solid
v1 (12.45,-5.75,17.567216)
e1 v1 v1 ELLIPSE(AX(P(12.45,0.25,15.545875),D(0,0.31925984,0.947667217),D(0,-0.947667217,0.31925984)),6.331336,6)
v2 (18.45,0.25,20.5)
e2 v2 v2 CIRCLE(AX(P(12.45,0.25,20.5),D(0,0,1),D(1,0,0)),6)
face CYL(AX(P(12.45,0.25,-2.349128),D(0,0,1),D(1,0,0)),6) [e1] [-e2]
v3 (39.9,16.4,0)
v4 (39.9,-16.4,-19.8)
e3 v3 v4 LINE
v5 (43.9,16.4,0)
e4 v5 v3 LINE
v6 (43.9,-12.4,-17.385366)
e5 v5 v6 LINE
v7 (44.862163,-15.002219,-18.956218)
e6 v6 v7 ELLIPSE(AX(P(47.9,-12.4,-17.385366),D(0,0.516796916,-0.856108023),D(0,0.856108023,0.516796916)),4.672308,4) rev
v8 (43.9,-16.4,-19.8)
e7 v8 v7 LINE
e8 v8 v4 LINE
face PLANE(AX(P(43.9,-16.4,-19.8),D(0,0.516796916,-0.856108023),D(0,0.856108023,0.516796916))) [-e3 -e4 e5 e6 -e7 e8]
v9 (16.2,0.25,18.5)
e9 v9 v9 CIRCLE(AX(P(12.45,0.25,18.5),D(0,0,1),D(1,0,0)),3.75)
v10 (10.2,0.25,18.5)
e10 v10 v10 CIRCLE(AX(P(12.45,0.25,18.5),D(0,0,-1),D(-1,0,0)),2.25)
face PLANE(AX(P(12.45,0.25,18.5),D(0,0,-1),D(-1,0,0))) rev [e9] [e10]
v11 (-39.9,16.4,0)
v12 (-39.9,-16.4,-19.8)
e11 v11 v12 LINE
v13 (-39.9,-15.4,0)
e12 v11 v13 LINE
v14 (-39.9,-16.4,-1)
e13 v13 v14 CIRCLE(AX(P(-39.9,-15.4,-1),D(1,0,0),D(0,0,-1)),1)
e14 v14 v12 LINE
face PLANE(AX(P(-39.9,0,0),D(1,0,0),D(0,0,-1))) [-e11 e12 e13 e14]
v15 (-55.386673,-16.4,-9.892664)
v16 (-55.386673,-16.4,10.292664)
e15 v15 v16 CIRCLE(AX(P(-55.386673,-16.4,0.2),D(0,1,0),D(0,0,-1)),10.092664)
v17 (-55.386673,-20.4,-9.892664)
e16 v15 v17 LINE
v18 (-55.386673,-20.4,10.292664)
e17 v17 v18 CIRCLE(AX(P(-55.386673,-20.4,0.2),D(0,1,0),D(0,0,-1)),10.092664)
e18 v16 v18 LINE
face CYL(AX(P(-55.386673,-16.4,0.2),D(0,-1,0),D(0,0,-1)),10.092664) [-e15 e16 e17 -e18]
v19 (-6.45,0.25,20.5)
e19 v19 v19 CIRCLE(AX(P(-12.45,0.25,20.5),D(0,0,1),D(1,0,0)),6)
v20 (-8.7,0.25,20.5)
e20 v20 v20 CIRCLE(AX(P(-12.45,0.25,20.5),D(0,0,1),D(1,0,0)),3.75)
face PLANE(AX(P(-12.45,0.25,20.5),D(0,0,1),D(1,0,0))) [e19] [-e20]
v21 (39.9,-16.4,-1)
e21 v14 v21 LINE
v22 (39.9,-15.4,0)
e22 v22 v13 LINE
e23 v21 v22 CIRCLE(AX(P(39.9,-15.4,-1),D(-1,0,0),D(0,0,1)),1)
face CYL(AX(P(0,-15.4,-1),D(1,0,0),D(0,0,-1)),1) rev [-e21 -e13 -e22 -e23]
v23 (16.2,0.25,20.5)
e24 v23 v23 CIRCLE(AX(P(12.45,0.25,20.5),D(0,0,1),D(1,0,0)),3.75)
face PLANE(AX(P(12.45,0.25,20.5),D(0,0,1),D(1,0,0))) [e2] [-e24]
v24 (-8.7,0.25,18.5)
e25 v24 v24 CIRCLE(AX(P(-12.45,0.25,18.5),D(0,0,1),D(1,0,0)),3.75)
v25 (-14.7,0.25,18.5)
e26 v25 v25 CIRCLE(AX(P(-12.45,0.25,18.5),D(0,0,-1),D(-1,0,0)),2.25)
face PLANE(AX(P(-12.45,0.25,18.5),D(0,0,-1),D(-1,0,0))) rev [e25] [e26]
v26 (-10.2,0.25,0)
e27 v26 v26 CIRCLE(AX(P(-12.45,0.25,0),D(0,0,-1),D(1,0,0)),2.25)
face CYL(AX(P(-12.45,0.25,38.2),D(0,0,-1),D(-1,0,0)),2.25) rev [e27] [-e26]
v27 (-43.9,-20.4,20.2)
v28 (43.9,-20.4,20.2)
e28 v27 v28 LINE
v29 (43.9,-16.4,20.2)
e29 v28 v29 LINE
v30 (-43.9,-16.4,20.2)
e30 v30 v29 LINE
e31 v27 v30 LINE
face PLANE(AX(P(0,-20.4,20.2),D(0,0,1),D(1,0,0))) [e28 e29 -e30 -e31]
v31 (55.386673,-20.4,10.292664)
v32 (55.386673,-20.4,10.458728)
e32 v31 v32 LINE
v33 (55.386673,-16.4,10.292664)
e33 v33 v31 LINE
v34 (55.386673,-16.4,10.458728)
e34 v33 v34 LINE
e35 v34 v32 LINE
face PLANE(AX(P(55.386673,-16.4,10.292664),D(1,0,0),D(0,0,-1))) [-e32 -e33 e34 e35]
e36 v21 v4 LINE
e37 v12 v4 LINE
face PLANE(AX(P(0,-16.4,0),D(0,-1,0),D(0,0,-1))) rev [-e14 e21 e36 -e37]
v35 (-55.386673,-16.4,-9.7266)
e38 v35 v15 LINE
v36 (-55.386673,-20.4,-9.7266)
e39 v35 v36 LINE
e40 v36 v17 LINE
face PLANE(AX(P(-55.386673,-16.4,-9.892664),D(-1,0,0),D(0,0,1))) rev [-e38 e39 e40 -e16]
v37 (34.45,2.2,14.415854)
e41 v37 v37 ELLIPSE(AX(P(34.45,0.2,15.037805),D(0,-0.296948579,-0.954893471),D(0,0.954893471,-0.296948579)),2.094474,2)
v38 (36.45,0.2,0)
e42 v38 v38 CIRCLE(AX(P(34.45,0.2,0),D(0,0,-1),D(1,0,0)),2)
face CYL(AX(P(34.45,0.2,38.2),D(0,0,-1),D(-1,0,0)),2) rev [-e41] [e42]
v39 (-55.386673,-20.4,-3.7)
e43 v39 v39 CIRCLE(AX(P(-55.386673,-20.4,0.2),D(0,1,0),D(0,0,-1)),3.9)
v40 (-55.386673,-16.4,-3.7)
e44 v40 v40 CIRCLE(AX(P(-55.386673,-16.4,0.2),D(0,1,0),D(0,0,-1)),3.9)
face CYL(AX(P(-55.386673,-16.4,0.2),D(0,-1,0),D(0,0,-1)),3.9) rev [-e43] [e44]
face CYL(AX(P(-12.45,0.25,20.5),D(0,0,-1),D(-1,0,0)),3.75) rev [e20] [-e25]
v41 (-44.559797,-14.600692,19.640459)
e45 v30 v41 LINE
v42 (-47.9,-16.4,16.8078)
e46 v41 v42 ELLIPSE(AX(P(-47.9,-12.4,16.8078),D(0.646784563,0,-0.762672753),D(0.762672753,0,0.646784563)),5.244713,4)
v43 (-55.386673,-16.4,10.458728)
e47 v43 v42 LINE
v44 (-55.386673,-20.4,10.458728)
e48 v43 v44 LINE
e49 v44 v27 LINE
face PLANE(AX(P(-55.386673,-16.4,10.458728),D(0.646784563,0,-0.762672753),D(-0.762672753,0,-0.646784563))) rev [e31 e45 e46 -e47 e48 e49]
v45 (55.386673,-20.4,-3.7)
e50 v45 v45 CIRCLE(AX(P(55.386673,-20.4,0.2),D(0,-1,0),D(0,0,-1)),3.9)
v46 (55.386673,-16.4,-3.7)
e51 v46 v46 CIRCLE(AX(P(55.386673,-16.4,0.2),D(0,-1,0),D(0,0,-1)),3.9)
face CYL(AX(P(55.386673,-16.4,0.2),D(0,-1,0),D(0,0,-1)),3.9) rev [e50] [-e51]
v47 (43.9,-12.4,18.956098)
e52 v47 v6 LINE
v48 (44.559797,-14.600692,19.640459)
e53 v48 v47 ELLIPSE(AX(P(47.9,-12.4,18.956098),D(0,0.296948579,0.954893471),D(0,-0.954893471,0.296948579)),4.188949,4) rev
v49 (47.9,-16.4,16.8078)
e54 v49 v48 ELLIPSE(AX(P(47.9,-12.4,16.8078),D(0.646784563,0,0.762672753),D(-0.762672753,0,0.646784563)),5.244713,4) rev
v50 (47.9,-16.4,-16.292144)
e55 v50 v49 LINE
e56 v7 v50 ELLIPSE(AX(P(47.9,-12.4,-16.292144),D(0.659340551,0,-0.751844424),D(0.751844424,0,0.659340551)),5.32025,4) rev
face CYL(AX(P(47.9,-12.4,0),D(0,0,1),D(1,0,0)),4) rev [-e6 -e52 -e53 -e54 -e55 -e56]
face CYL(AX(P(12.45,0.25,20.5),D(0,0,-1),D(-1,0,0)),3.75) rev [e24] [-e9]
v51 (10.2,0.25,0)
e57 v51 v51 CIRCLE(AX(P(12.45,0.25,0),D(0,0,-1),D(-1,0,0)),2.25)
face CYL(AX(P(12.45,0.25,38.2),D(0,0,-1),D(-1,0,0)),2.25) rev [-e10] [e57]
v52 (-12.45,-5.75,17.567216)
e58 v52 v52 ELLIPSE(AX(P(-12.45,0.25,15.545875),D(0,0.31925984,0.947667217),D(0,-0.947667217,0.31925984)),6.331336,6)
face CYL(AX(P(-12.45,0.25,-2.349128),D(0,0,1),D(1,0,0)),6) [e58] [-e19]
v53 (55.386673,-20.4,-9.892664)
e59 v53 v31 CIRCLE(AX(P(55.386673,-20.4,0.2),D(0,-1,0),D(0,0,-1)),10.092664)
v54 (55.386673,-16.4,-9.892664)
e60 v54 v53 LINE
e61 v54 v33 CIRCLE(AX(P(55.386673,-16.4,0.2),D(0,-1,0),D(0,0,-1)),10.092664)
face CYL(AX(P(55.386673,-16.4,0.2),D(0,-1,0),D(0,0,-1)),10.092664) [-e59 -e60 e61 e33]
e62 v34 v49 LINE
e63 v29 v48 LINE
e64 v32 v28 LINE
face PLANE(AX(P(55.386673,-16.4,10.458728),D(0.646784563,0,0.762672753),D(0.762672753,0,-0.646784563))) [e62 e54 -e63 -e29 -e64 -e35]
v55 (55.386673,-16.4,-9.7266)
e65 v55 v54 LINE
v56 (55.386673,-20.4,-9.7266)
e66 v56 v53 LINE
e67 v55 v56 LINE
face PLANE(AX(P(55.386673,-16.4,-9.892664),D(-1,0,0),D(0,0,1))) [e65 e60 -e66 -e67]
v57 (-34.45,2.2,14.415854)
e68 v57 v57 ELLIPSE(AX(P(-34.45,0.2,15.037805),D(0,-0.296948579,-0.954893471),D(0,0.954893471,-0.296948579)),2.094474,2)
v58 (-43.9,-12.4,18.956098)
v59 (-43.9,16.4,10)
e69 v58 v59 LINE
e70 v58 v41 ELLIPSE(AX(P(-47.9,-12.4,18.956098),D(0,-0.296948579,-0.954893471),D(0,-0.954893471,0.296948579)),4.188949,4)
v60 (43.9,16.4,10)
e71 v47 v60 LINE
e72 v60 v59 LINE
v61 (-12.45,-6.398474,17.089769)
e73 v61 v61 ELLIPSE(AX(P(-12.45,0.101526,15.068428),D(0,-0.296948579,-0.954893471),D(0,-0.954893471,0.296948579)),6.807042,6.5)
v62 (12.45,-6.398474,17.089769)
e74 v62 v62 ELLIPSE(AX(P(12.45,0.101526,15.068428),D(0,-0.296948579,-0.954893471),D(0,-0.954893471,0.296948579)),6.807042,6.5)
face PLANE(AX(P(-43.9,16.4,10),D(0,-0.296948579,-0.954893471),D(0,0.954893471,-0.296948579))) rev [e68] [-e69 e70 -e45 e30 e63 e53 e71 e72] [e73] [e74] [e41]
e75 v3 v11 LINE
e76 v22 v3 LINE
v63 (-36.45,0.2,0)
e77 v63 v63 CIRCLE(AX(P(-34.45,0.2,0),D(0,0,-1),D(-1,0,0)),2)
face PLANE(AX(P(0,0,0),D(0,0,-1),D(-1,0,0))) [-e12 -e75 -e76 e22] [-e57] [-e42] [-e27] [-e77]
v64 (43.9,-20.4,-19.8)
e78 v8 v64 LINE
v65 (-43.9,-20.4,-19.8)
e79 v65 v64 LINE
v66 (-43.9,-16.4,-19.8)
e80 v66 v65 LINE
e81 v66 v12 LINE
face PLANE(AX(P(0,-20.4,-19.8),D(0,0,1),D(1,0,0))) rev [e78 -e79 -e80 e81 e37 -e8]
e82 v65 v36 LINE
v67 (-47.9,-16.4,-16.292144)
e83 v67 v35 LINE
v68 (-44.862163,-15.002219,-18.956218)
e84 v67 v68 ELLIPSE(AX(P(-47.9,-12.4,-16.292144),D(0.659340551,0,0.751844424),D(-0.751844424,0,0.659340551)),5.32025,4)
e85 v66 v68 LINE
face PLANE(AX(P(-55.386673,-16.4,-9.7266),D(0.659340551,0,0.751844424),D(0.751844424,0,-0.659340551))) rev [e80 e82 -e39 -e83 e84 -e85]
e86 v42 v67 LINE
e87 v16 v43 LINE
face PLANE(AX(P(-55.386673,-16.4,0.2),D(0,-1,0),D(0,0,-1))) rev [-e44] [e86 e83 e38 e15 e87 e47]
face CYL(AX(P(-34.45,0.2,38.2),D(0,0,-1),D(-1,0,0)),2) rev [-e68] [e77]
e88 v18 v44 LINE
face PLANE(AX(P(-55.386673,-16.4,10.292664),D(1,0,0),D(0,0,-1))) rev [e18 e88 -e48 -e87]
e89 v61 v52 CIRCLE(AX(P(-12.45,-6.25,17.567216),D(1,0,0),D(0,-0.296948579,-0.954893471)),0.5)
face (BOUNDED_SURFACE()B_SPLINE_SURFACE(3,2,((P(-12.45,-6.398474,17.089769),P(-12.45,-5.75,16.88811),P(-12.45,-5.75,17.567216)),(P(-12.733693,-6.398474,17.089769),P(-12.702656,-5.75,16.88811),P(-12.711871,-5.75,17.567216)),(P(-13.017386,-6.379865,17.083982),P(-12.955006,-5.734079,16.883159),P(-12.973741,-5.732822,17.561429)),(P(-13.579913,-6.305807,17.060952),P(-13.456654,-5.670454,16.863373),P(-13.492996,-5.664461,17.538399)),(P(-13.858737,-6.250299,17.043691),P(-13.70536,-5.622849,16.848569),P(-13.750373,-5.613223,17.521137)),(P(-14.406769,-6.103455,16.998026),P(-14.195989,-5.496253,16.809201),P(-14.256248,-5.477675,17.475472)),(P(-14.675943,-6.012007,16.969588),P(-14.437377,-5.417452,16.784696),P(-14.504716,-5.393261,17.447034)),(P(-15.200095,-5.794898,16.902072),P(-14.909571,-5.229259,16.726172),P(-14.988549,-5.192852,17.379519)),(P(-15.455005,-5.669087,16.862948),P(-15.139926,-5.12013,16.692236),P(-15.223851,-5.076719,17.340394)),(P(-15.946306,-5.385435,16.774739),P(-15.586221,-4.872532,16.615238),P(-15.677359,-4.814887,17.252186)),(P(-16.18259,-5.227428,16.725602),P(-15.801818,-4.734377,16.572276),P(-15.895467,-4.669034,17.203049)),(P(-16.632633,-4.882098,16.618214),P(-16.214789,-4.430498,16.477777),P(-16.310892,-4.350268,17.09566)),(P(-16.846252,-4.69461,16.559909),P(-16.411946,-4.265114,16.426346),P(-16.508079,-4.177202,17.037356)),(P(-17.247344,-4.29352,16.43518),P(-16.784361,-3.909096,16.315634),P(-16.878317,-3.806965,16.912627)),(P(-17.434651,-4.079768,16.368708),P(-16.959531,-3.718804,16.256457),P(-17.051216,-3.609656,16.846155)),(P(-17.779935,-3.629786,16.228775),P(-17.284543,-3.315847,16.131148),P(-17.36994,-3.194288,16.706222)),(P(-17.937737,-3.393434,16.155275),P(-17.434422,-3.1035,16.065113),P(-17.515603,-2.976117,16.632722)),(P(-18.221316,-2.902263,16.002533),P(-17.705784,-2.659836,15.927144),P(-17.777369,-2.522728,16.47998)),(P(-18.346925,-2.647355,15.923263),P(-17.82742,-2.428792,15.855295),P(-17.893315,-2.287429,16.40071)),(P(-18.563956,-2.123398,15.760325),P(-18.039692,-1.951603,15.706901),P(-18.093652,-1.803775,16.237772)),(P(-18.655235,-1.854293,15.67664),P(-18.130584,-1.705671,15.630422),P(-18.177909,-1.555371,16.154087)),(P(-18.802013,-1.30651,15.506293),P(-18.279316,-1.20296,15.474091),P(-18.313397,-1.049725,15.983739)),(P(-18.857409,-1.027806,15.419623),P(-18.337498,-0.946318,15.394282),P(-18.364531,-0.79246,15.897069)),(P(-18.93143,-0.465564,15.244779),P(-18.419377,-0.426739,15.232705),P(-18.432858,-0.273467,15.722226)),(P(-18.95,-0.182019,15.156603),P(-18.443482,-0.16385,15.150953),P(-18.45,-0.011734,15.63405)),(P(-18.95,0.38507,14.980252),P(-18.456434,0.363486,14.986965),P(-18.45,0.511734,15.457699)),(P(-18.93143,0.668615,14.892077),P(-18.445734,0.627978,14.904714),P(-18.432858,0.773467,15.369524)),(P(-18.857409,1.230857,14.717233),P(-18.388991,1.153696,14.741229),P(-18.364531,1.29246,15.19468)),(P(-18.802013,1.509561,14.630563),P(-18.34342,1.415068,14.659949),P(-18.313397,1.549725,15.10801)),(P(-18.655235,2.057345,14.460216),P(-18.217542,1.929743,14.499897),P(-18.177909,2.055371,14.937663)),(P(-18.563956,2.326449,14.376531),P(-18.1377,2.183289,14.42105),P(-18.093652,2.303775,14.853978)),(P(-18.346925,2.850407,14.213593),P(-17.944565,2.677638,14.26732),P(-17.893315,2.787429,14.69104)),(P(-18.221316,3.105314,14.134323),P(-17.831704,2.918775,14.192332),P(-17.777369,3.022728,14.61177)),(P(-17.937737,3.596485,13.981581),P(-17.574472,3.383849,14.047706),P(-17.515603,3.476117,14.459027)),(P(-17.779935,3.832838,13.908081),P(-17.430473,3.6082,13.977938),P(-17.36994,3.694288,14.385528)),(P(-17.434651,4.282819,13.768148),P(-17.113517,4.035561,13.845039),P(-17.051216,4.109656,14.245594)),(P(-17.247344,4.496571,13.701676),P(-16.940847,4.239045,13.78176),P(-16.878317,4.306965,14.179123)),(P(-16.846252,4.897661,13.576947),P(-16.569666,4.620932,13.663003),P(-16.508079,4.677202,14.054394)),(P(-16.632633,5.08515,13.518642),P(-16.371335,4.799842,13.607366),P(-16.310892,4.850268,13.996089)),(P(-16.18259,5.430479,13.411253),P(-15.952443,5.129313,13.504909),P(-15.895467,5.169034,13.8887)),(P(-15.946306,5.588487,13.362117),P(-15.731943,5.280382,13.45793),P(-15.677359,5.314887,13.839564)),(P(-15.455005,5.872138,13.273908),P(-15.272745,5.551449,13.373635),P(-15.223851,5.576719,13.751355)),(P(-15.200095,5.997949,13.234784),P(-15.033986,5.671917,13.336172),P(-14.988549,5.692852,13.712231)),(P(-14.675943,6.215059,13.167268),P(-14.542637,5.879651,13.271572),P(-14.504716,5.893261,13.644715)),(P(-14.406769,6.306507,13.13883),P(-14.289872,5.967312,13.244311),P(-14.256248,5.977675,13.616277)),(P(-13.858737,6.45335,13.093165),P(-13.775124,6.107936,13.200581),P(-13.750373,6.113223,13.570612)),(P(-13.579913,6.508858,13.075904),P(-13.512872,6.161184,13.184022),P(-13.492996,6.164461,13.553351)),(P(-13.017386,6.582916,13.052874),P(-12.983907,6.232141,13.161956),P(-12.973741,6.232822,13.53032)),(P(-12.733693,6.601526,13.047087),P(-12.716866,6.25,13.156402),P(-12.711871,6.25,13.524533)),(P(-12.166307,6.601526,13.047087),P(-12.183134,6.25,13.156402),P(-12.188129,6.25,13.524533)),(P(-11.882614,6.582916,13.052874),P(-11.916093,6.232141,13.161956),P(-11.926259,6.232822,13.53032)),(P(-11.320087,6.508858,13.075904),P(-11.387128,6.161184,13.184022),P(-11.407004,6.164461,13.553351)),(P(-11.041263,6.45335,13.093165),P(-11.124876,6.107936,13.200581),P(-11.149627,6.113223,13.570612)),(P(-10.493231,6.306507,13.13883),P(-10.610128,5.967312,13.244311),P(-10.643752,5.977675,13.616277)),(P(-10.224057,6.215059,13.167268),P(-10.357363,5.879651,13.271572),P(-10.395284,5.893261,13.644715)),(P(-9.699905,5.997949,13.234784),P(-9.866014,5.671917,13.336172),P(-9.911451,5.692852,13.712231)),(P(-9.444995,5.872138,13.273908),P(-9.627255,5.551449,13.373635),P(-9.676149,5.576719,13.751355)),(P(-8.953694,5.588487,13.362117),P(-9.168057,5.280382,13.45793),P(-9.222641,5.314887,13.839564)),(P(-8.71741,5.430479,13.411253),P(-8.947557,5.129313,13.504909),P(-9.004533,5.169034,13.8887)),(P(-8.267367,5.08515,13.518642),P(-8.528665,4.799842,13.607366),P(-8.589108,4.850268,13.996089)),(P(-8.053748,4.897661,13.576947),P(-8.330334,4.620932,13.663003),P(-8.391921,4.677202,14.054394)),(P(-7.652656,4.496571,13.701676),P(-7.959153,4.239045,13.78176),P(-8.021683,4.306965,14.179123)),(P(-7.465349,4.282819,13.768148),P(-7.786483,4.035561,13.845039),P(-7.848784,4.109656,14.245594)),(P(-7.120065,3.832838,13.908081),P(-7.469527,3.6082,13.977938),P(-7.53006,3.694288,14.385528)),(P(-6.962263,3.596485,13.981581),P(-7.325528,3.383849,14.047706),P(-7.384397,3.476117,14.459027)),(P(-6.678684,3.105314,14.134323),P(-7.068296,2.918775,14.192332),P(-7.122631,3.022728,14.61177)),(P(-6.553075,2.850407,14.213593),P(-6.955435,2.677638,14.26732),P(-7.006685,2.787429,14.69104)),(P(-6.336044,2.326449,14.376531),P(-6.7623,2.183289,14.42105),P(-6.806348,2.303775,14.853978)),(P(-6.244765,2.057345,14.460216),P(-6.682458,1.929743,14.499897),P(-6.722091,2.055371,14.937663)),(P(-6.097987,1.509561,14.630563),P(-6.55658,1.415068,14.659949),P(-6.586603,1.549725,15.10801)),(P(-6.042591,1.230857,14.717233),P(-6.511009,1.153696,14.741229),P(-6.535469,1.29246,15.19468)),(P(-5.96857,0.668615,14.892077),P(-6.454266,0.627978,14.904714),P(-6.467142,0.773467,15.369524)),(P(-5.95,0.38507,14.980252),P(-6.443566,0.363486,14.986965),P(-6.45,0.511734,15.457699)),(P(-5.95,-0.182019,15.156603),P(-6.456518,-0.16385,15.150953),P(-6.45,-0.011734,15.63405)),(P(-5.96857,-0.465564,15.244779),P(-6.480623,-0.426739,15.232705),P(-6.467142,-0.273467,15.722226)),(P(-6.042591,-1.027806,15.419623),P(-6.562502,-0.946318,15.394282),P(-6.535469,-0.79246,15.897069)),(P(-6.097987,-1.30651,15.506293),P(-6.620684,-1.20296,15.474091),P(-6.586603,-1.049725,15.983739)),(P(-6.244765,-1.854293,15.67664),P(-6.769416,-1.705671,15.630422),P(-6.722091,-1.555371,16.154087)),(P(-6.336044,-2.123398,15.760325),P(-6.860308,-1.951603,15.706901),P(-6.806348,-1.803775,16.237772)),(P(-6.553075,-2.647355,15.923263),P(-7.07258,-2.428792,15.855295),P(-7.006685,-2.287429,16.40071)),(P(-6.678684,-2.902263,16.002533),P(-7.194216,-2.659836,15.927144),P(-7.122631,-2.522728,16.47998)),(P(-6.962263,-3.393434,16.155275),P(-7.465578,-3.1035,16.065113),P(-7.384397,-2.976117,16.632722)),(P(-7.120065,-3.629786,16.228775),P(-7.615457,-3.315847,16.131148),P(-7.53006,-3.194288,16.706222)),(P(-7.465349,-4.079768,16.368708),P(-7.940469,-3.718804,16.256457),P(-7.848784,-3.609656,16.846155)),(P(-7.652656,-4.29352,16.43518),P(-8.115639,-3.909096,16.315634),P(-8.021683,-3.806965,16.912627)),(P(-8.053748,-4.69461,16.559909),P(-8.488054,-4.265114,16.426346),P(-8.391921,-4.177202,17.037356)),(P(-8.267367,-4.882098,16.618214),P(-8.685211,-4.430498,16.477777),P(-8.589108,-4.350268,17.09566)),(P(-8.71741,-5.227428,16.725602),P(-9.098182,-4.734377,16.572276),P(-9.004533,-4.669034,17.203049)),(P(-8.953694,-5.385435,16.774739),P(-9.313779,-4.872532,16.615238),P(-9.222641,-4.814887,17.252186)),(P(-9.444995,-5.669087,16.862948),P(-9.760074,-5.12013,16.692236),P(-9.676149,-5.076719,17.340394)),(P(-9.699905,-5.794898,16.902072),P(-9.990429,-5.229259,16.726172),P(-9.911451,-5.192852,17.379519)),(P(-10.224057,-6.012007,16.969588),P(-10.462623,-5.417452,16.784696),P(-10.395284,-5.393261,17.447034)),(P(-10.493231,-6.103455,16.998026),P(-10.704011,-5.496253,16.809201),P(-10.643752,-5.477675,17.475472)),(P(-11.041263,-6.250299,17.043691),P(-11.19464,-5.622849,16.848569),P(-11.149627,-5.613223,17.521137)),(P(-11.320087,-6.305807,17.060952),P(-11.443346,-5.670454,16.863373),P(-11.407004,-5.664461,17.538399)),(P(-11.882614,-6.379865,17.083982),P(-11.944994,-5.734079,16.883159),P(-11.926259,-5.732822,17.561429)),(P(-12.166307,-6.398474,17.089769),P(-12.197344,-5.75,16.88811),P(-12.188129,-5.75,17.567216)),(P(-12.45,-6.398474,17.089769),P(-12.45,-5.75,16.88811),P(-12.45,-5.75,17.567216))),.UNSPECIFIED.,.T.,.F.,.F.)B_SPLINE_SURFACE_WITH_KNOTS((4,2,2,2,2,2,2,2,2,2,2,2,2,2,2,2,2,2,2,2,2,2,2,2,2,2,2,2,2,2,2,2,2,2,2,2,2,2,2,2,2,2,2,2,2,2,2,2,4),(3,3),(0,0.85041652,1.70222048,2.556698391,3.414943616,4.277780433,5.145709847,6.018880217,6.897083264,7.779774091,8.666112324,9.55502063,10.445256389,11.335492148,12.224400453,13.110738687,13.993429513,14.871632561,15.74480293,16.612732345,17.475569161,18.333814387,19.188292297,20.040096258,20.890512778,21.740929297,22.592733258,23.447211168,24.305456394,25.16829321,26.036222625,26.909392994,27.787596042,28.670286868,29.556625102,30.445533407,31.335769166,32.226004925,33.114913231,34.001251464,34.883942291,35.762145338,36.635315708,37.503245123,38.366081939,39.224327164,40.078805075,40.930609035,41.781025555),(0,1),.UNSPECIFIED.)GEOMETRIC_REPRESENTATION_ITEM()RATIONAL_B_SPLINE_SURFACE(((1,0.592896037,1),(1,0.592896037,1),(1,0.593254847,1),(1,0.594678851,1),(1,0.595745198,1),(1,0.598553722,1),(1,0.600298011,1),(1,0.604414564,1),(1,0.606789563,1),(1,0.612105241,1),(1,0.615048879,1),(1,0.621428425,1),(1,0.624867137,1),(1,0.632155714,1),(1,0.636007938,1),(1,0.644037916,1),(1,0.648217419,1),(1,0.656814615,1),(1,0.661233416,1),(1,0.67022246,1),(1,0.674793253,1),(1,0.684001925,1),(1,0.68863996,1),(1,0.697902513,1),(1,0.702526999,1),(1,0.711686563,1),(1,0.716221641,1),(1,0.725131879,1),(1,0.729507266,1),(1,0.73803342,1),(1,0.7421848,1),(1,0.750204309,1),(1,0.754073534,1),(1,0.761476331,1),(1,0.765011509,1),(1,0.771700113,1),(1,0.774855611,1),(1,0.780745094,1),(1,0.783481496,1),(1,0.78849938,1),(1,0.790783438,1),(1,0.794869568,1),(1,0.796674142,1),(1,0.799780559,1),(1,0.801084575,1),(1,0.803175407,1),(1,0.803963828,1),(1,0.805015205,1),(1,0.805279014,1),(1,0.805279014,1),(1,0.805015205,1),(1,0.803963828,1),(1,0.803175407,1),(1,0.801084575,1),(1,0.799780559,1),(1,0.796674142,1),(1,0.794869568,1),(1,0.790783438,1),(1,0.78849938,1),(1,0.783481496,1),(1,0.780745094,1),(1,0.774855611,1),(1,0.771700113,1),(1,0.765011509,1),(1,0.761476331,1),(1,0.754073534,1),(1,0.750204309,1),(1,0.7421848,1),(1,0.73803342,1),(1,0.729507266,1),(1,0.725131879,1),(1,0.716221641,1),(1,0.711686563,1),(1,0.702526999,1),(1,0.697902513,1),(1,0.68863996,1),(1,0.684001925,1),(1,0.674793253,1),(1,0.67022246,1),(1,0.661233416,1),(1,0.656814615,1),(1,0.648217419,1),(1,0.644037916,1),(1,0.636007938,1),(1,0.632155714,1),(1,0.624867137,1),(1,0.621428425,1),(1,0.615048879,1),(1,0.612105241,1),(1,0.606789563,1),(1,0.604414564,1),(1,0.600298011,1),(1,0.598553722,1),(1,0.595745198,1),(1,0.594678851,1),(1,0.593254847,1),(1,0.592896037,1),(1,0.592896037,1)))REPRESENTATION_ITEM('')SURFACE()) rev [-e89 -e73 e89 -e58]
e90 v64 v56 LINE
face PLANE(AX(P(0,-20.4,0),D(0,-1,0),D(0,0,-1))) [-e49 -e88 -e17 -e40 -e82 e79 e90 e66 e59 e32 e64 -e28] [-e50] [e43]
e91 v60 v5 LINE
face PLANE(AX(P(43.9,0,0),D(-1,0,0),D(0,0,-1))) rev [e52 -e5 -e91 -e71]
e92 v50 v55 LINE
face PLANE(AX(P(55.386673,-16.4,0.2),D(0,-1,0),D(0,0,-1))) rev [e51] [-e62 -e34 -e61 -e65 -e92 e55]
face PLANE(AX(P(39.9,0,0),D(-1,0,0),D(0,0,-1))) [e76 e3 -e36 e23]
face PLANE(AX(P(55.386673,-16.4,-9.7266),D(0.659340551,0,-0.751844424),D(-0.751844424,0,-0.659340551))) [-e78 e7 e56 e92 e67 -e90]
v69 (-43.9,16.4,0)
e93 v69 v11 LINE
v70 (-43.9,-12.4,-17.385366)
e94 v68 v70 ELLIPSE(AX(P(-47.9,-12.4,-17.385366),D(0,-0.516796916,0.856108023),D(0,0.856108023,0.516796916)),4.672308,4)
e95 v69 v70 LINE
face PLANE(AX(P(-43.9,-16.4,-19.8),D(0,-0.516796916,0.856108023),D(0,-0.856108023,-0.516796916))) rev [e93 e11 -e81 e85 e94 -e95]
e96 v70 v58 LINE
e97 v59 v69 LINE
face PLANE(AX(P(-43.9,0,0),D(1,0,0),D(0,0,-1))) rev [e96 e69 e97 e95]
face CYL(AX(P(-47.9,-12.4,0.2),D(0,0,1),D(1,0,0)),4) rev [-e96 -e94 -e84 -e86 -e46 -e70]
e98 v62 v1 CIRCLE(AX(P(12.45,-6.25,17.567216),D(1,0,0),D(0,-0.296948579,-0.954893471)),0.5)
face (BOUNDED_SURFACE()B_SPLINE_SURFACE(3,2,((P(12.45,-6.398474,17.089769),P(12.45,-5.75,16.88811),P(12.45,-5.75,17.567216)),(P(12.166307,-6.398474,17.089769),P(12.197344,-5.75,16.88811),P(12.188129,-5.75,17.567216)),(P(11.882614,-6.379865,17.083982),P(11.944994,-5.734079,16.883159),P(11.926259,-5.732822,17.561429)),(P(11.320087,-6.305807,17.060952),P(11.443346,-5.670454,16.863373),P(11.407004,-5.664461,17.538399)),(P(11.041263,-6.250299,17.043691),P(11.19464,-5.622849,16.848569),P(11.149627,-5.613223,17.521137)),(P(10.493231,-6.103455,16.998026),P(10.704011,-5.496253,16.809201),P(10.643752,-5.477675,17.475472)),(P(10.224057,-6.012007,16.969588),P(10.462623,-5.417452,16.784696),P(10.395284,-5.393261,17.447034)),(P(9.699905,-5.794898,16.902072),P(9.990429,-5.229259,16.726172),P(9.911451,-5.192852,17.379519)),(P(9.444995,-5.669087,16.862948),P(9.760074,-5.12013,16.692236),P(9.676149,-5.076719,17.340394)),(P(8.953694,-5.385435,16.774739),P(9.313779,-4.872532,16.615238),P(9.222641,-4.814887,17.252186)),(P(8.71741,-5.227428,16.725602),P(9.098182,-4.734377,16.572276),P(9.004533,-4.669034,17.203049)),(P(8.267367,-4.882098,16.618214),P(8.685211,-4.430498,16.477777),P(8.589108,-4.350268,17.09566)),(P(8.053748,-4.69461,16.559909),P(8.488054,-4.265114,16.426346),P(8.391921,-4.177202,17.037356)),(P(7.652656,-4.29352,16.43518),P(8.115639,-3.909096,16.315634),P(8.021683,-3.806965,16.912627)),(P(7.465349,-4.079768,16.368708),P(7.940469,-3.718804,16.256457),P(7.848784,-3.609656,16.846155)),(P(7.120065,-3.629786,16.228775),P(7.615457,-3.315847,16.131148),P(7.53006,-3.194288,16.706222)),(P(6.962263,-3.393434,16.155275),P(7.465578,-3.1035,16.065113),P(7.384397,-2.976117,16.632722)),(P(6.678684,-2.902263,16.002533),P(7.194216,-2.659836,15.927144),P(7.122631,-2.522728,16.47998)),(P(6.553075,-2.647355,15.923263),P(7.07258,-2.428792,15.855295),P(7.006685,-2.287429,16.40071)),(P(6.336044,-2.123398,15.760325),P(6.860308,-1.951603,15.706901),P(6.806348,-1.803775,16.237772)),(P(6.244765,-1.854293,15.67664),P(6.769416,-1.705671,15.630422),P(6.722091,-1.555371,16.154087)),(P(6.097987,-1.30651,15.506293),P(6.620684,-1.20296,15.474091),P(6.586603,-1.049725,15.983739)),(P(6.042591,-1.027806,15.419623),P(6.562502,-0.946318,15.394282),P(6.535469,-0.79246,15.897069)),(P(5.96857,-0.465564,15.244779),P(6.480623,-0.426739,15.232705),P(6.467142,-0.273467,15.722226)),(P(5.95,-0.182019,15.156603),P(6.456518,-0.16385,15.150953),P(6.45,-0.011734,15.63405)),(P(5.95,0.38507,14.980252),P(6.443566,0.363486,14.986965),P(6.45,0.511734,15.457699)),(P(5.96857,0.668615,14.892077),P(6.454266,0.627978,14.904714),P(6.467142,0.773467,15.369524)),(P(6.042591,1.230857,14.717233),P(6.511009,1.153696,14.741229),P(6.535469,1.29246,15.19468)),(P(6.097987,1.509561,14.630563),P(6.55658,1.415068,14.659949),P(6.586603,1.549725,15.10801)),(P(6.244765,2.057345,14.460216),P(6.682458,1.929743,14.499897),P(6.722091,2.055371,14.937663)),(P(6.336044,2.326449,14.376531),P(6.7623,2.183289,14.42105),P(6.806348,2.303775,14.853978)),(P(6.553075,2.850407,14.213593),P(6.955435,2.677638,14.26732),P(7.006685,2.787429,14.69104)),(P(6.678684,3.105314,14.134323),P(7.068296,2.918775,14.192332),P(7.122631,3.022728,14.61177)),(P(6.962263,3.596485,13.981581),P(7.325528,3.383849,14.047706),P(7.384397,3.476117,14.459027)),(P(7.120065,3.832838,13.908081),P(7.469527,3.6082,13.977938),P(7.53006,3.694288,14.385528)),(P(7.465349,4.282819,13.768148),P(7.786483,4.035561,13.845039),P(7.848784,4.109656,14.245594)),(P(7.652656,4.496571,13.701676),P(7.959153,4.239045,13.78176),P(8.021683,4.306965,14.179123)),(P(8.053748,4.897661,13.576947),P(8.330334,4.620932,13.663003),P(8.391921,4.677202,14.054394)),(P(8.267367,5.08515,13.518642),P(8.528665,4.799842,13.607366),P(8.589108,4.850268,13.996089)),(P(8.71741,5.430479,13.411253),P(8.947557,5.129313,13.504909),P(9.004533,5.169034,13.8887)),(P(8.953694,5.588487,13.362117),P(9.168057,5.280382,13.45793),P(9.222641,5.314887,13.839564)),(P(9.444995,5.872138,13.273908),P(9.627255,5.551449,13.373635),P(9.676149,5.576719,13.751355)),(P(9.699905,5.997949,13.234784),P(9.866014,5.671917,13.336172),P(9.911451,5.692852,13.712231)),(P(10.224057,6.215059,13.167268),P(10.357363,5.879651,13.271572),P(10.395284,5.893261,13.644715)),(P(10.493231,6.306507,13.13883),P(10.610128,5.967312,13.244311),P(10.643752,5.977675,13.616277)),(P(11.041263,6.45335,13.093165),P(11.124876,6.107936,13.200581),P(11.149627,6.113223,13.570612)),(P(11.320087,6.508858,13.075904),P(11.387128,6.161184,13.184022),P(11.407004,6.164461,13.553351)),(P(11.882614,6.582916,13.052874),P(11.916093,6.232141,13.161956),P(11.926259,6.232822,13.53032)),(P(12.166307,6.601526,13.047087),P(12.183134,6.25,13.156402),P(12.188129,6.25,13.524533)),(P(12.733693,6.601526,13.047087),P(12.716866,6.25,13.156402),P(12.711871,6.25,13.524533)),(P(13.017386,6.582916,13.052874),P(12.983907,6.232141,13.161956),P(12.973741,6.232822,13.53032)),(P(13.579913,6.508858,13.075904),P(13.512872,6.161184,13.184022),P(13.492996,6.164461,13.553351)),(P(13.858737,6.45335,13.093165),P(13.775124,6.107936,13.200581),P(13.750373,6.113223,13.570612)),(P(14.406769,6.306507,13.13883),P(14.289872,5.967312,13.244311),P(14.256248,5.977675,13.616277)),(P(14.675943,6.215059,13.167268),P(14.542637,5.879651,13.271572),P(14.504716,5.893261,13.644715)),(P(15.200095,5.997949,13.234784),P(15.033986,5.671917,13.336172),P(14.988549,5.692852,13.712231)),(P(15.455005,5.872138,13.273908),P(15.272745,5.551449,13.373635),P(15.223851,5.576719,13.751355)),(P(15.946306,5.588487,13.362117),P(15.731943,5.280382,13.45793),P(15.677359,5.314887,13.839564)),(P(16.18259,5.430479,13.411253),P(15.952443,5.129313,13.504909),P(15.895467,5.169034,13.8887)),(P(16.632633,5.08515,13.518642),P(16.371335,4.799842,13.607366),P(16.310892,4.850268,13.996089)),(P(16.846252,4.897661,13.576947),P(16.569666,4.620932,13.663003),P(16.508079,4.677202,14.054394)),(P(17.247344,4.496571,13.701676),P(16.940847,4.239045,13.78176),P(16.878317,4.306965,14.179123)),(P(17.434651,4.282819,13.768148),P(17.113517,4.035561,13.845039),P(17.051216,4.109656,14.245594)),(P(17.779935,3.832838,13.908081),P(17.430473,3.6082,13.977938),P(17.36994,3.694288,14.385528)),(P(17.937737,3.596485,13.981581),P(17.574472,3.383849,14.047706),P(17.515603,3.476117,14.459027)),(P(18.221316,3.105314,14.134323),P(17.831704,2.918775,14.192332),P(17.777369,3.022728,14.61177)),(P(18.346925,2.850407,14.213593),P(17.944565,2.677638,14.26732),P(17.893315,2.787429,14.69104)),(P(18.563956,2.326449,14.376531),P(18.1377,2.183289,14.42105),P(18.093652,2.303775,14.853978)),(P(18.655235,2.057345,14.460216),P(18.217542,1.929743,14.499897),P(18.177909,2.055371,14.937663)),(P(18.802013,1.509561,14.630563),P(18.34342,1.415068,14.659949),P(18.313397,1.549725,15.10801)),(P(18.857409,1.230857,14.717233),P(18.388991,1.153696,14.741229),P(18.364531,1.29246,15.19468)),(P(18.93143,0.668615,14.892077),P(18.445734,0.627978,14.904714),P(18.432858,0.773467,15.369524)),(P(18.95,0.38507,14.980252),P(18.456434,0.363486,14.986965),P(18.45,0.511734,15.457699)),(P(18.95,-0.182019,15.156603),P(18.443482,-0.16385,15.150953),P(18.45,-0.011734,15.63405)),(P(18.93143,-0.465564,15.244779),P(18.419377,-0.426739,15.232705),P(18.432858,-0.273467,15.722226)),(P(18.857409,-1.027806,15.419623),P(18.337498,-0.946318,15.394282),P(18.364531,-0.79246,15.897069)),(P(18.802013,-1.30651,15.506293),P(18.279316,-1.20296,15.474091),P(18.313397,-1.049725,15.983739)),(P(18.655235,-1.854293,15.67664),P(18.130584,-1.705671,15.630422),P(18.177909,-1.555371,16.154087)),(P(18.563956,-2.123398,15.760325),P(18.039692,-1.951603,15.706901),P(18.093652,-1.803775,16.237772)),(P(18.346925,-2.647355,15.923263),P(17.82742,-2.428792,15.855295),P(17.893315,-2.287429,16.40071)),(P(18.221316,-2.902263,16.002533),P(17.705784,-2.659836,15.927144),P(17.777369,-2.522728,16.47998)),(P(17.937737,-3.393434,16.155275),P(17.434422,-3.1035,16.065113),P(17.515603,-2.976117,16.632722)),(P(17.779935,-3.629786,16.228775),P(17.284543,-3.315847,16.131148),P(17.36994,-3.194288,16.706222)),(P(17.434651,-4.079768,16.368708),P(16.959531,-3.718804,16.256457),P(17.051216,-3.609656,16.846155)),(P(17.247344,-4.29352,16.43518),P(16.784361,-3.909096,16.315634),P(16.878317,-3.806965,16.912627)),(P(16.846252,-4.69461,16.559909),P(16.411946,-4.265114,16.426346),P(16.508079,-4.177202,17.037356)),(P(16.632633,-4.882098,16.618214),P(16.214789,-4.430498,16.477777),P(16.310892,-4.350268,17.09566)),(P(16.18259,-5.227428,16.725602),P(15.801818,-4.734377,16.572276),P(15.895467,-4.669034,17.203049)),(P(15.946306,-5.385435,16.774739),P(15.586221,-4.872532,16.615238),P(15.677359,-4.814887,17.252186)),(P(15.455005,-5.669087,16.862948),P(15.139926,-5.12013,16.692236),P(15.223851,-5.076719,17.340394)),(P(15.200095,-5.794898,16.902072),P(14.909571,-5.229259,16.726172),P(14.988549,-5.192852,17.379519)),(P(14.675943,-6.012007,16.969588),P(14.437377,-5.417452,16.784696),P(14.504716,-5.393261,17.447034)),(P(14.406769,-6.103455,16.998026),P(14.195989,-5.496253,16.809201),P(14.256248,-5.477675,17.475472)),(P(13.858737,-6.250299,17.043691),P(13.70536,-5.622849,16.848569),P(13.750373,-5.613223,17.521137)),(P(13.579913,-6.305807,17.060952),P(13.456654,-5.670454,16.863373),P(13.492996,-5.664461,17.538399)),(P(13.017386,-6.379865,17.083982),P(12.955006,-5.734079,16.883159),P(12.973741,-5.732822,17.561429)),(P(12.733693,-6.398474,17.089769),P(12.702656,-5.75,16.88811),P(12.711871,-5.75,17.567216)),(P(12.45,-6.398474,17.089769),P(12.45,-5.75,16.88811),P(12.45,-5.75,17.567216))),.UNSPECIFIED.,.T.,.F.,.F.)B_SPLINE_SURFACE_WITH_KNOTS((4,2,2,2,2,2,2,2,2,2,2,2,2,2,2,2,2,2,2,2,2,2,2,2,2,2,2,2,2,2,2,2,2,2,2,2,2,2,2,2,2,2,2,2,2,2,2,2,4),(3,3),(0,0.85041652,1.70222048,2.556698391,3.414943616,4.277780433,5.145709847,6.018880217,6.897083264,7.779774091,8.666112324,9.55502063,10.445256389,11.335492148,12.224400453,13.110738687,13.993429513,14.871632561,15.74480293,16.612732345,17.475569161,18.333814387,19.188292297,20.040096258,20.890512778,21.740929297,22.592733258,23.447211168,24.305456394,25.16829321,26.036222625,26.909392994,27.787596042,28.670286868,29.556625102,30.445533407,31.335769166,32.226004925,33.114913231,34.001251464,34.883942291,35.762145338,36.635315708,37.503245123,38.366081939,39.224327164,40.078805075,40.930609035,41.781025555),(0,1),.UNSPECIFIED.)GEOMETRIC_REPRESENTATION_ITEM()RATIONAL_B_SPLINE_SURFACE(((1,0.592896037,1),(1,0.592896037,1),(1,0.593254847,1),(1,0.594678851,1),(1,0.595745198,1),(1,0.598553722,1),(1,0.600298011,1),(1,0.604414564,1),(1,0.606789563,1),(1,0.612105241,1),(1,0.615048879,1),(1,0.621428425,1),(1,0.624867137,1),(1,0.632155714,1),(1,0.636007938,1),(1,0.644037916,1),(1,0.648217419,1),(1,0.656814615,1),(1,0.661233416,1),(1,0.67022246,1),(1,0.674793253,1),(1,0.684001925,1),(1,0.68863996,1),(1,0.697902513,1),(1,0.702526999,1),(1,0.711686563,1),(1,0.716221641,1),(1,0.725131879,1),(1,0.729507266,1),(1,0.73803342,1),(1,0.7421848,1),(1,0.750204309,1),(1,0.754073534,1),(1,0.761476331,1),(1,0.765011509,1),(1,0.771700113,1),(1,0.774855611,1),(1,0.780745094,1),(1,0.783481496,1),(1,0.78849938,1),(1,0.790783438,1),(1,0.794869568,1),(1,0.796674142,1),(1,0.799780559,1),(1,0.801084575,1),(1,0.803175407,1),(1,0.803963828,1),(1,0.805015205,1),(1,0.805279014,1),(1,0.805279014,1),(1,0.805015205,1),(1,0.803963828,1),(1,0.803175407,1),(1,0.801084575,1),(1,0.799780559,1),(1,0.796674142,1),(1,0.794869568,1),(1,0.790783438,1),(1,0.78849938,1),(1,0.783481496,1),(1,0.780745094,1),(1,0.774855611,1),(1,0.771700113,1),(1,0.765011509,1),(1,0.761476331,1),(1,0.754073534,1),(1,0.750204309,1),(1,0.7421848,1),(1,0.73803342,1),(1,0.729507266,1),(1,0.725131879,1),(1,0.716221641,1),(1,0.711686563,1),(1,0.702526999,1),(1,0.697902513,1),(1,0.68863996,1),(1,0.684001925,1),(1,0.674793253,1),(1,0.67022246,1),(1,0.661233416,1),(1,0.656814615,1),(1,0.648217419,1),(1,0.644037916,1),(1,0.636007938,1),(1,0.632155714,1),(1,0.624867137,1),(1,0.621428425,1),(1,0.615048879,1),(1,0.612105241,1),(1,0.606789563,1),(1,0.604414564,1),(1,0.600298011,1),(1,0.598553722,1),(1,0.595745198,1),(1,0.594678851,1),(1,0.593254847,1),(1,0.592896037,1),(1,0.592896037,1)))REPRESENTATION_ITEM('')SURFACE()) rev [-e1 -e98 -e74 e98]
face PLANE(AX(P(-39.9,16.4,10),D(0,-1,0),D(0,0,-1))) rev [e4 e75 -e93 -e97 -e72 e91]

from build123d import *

# Parameters (mm, degrees)
SKETCH1_W            = 79.8
SKETCH1_H            = 32.8
BOSS_EXTRUDE1_DEPTH  = 10
SKETCH3_W            = 79.8
SKETCH3_H            = 19.8
SKETCH3_H_2          = 10.2
SKETCH3_H_3          = 10
BOSS_EXTRUDE3_DEPTH  = 4
BOSS_EXTRUDE4_DEPTH  = 4
SKETCH5_R            = 3.9
BOSS_EXTRUDE5_DEPTH  = 4
FILLET3_R            = 4
FILLET4_R            = 1
BOSS_EXTRUDE9_DEPTH  = 79.8
SKETCH6_R            = 2.25
SKETCH6_R_2          = 2
CUT_EXTRUDE1_DEPTH   = 38.2
BOSS_EXTRUDE10_REACH = 80.553
SKETCH12_R           = 6
SKETCH12_R_2         = 2.25
BOSS_EXTRUDE11_START = 2
SKETCH14_R           = 6
SKETCH14_R_2         = 3.75
BOSS_EXTRUDE11_DEPTH = 2
FILLET5_R            = 0.5


with BuildPart() as part:
    # Sketch1 → Boss-Extrude1 (new body)
    with BuildSketch(Plane.XY):
        Rectangle(SKETCH1_W, SKETCH1_H)
    extrude(amount=BOSS_EXTRUDE1_DEPTH)

    # Sketch3 → Boss-Extrude3 (add)
    with BuildSketch(Plane.XZ.offset(16.4)):
        with Locations((0, -9.9)):
            Rectangle(SKETCH3_W, SKETCH3_H)
        with Locations((0, 15.1)):
            Rectangle(SKETCH3_W, SKETCH3_H_2)
        with Locations((0, 5)):
            Rectangle(SKETCH3_W, SKETCH3_H_3)
    extrude(amount=BOSS_EXTRUDE3_DEPTH)

    # Sketch4 → Boss-Extrude4 (add)
    with BuildSketch(Plane.ZY.offset(39.9)):
        Polygon((10, 16.4), (20.2, -16.4), (20.2, -20.4), (-19.8, -20.4), (-19.8, -16.4), (0, 16.4), align=None)
    boss_extrude4 = extrude(amount=BOSS_EXTRUDE4_DEPTH)

    # Mirror1: Boss-Extrude4 across plane
    add(boss_extrude4.mirror(Plane(origin=(0, 0, 0), x_dir=(0, 0, 1), z_dir=(1, 0, 0))))

    # Sketch5 → Boss-Extrude5 (add)
    with BuildSketch(Plane.XZ.offset(20.4)):
        with BuildLine():
            Line((43.9, 20.2), (43.9, -19.8))
            Line((43.9, -19.8), (55.386672933, -9.72660048))
            Line((55.386672933, -9.72660048), (55.386672933, -9.892664239))
            ThreePointArc((55.386672933, -9.892664239), (65.479337172, 0.2), (55.386672933, 10.292664239))
            Line((55.386672933, 10.292664239), (55.386672933, 10.458727998))
            Line((55.386672933, 10.458727998), (43.9, 20.2))
        make_face()
        with Locations(Location((55.386672933, 0.2, 0), (0, 0, 270))):
            Circle(SKETCH5_R, mode=Mode.SUBTRACT)
    boss_extrude5 = extrude(amount=-BOSS_EXTRUDE5_DEPTH)

    # Mirror2: Boss-Extrude5 across plane
    add(boss_extrude5.mirror(Plane(origin=(0, 0, 0), x_dir=(0, 0, 1), z_dir=(1, 0, 0))))

    # Fillet3
    # the kernel refuses this fillet: 4 mm, written as the material it adds along each edge
    with BuildSketch(Plane(origin=(43.9, -16.4, 30.2), x_dir=(1, 0, 0), z_dir=(0, 0, -1))) as fillet3_piece_1_section:
        with BuildLine():
            CenterArc((FILLET3_R, -FILLET3_R), FILLET3_R, 90, 90)
            Line((0, -FILLET3_R), (0, 0))
            Line((0, 0), (FILLET3_R, 0))
        make_face()
    fillet3_piece_1 = extrude(amount=60, mode=Mode.PRIVATE)
    fillet3_piece_1 = split(fillet3_piece_1, bisect_by=Plane(origin=(54.225128719, -15.491118341, 11.44377547), z_dir=(-0.6467845633993831, 0, -0.7626727532489078)), keep=Keep.TOP, mode=Mode.PRIVATE)
    fillet3_piece_1 = split(fillet3_piece_1, bisect_by=Plane(origin=(54.366477736, -15.491118341, -10.621275019), z_dir=(-0.659340550917199, 0, 0.7518444240108485)), keep=Keep.TOP, mode=Mode.PRIVATE)
    fillet3_piece_1 = split(fillet3_piece_1, bisect_by=Plane(origin=(44.781661859, -6.837280787, -14.027382914), z_dir=(0, -0.5167969163836084, 0.8561080231001189)), keep=Keep.TOP, mode=Mode.PRIVATE)
    fillet3_piece_1 = split(fillet3_piece_1, bisect_by=Plane(origin=(44.781661859, -9.930876549, 18.18826039), z_dir=(0, -0.29694857943139136, -0.9548934711127094)), keep=Keep.TOP, mode=Mode.PRIVATE)
    add(fillet3_piece_1)
    with BuildSketch(Plane(origin=(-43.9, -16.4, 30.2), x_dir=(-1, 0, 0), z_dir=(0, 0, -1))) as fillet3_piece_2_section:
        with BuildLine():
            CenterArc((FILLET3_R, FILLET3_R), FILLET3_R, 180, 90)
            Line((0, FILLET3_R), (0, 0))
            Line((0, 0), (FILLET3_R, 0))
        make_face()
    fillet3_piece_2 = extrude(amount=60, mode=Mode.PRIVATE)
    fillet3_piece_2 = split(fillet3_piece_2, bisect_by=Plane(origin=(-54.366477736, -15.491118341, -10.621275019), z_dir=(0.659340550917199, 0, 0.7518444240108485)), keep=Keep.TOP, mode=Mode.PRIVATE)
    fillet3_piece_2 = split(fillet3_piece_2, bisect_by=Plane(origin=(-44.781661859, -6.837280787, -14.027382914), z_dir=(0, -0.5167969163836084, 0.8561080231001189)), keep=Keep.TOP, mode=Mode.PRIVATE)
    fillet3_piece_2 = split(fillet3_piece_2, bisect_by=Plane(origin=(-54.225128719, -15.491118341, 11.44377547), z_dir=(0.6467845633993831, 0, -0.7626727532489078)), keep=Keep.TOP, mode=Mode.PRIVATE)
    fillet3_piece_2 = split(fillet3_piece_2, bisect_by=Plane(origin=(-44.781661859, -9.930876549, 18.18826039), z_dir=(0, -0.29694857943139136, -0.9548934711127094)), keep=Keep.TOP, mode=Mode.PRIVATE)
    add(fillet3_piece_2)

    # Fillet4
    fillet4_edges = [part.edges().sort_by_distance(p)[0] for p in [
        (0, -16.4, 0),
    ]]
    fillet(fillet4_edges, radius=FILLET4_R)

    # Sketch11 → Boss-Extrude9 (add)
    with BuildSketch(Plane(origin=(-39.9, 0, 0), x_dir=(0, 0, -1), z_dir=(1, 0, 0))):
        Polygon((-20.2, -16.4), (-10, -16.4), (-10, 16.4), align=None)
    extrude(amount=BOSS_EXTRUDE9_DEPTH)

    # Sketch6 → Cut-Extrude1 (cut)
    with BuildSketch(Plane(origin=(0, 0, 0), x_dir=(-1, 0, 0), z_dir=(0, 0, -1))):
        with Locations((-12.45, 0.25)):
            Circle(SKETCH6_R)
        with Locations(Location((12.45, 0.25, 0), (0, 0, 90))):
            Circle(SKETCH6_R)
        with Locations((34.45, 0.2)):
            Circle(SKETCH6_R_2)
        with Locations(Location((-34.45, 0.2, 0), (0, 0, 90))):
            Circle(SKETCH6_R_2)
    extrude(amount=-CUT_EXTRUDE1_DEPTH, mode=Mode.SUBTRACT)

    # Boss-Extrude10: up to this plane
    boss_extrude10_end = Plane(origin=(-43.9, 16.4, 10), z_dir=(0, -0.29694857943139136, -0.9548934711127095))
    # Sketch12 → Boss-Extrude10 (add, up to the surface)
    with BuildSketch(Plane(origin=(0, 0, 18.5), x_dir=(-1, 0, 0), z_dir=(0, 0, -1)), mode=Mode.PRIVATE) as boss_extrude10_sk1:
        with Locations(Location((12.45, 0.25, 0), (0, 0, 270))):
            Circle(SKETCH12_R)
        with Locations((12.45, 0.25)):
            Circle(SKETCH12_R_2, mode=Mode.SUBTRACT)
    boss_extrude10_tool1 = split(extrude(boss_extrude10_sk1.sketch, amount=BOSS_EXTRUDE10_REACH, mode=Mode.PRIVATE), bisect_by=boss_extrude10_end, keep=Keep.BOTH, mode=Mode.PRIVATE)
    add(boss_extrude10_tool1.solids().sort_by_distance((-12.45, 6.080294, 18.5))[0])
    # Sketch12 → Boss-Extrude10 (add, up to the surface)
    with BuildSketch(Plane(origin=(0, 0, 18.5), x_dir=(-1, 0, 0), z_dir=(0, 0, -1)), mode=Mode.PRIVATE) as boss_extrude10_sk2:
        with Locations(Location((-12.45, 0.25, 0), (0, 0, 270))):
            Circle(SKETCH12_R)
        with Locations((-12.45, 0.25)):
            Circle(SKETCH12_R_2, mode=Mode.SUBTRACT)
    boss_extrude10_tool2 = split(extrude(boss_extrude10_sk2.sketch, amount=BOSS_EXTRUDE10_REACH, mode=Mode.PRIVATE), bisect_by=boss_extrude10_end, keep=Keep.BOTH, mode=Mode.PRIVATE)
    add(boss_extrude10_tool2.solids().sort_by_distance((12.45, 6.080294, 18.5))[0])

    # Sketch14 → Boss-Extrude11 (add)
    # profile 1 of 2: a face of its own
    with BuildSketch(Plane.XY.offset(18.5).offset(BOSS_EXTRUDE11_START)):
        with Locations((-12.45, 0.25)):
            Circle(SKETCH14_R)
        with Locations((-12.45, 0.25)):
            Circle(SKETCH14_R_2, mode=Mode.SUBTRACT)
    # profile 2 of 2: a face of its own
    with BuildSketch(Plane.XY.offset(18.5).offset(BOSS_EXTRUDE11_START)):
        with Locations((12.45, 0.25)):
            Circle(SKETCH14_R)
        with Locations((12.45, 0.25)):
            Circle(SKETCH14_R_2, mode=Mode.SUBTRACT)
    extrude(amount=-BOSS_EXTRUDE11_DEPTH)

    # Fillet5
    fillet5_edges = [part.edges().sort_by_distance(p)[0] for p in [
        (-12.449991171, 6.25, 13.156402439),
        (12.450008829, 6.25, 13.156402439),
    ]]
    fillet(fillet5_edges, radius=FILLET5_R)


solid = part.part
